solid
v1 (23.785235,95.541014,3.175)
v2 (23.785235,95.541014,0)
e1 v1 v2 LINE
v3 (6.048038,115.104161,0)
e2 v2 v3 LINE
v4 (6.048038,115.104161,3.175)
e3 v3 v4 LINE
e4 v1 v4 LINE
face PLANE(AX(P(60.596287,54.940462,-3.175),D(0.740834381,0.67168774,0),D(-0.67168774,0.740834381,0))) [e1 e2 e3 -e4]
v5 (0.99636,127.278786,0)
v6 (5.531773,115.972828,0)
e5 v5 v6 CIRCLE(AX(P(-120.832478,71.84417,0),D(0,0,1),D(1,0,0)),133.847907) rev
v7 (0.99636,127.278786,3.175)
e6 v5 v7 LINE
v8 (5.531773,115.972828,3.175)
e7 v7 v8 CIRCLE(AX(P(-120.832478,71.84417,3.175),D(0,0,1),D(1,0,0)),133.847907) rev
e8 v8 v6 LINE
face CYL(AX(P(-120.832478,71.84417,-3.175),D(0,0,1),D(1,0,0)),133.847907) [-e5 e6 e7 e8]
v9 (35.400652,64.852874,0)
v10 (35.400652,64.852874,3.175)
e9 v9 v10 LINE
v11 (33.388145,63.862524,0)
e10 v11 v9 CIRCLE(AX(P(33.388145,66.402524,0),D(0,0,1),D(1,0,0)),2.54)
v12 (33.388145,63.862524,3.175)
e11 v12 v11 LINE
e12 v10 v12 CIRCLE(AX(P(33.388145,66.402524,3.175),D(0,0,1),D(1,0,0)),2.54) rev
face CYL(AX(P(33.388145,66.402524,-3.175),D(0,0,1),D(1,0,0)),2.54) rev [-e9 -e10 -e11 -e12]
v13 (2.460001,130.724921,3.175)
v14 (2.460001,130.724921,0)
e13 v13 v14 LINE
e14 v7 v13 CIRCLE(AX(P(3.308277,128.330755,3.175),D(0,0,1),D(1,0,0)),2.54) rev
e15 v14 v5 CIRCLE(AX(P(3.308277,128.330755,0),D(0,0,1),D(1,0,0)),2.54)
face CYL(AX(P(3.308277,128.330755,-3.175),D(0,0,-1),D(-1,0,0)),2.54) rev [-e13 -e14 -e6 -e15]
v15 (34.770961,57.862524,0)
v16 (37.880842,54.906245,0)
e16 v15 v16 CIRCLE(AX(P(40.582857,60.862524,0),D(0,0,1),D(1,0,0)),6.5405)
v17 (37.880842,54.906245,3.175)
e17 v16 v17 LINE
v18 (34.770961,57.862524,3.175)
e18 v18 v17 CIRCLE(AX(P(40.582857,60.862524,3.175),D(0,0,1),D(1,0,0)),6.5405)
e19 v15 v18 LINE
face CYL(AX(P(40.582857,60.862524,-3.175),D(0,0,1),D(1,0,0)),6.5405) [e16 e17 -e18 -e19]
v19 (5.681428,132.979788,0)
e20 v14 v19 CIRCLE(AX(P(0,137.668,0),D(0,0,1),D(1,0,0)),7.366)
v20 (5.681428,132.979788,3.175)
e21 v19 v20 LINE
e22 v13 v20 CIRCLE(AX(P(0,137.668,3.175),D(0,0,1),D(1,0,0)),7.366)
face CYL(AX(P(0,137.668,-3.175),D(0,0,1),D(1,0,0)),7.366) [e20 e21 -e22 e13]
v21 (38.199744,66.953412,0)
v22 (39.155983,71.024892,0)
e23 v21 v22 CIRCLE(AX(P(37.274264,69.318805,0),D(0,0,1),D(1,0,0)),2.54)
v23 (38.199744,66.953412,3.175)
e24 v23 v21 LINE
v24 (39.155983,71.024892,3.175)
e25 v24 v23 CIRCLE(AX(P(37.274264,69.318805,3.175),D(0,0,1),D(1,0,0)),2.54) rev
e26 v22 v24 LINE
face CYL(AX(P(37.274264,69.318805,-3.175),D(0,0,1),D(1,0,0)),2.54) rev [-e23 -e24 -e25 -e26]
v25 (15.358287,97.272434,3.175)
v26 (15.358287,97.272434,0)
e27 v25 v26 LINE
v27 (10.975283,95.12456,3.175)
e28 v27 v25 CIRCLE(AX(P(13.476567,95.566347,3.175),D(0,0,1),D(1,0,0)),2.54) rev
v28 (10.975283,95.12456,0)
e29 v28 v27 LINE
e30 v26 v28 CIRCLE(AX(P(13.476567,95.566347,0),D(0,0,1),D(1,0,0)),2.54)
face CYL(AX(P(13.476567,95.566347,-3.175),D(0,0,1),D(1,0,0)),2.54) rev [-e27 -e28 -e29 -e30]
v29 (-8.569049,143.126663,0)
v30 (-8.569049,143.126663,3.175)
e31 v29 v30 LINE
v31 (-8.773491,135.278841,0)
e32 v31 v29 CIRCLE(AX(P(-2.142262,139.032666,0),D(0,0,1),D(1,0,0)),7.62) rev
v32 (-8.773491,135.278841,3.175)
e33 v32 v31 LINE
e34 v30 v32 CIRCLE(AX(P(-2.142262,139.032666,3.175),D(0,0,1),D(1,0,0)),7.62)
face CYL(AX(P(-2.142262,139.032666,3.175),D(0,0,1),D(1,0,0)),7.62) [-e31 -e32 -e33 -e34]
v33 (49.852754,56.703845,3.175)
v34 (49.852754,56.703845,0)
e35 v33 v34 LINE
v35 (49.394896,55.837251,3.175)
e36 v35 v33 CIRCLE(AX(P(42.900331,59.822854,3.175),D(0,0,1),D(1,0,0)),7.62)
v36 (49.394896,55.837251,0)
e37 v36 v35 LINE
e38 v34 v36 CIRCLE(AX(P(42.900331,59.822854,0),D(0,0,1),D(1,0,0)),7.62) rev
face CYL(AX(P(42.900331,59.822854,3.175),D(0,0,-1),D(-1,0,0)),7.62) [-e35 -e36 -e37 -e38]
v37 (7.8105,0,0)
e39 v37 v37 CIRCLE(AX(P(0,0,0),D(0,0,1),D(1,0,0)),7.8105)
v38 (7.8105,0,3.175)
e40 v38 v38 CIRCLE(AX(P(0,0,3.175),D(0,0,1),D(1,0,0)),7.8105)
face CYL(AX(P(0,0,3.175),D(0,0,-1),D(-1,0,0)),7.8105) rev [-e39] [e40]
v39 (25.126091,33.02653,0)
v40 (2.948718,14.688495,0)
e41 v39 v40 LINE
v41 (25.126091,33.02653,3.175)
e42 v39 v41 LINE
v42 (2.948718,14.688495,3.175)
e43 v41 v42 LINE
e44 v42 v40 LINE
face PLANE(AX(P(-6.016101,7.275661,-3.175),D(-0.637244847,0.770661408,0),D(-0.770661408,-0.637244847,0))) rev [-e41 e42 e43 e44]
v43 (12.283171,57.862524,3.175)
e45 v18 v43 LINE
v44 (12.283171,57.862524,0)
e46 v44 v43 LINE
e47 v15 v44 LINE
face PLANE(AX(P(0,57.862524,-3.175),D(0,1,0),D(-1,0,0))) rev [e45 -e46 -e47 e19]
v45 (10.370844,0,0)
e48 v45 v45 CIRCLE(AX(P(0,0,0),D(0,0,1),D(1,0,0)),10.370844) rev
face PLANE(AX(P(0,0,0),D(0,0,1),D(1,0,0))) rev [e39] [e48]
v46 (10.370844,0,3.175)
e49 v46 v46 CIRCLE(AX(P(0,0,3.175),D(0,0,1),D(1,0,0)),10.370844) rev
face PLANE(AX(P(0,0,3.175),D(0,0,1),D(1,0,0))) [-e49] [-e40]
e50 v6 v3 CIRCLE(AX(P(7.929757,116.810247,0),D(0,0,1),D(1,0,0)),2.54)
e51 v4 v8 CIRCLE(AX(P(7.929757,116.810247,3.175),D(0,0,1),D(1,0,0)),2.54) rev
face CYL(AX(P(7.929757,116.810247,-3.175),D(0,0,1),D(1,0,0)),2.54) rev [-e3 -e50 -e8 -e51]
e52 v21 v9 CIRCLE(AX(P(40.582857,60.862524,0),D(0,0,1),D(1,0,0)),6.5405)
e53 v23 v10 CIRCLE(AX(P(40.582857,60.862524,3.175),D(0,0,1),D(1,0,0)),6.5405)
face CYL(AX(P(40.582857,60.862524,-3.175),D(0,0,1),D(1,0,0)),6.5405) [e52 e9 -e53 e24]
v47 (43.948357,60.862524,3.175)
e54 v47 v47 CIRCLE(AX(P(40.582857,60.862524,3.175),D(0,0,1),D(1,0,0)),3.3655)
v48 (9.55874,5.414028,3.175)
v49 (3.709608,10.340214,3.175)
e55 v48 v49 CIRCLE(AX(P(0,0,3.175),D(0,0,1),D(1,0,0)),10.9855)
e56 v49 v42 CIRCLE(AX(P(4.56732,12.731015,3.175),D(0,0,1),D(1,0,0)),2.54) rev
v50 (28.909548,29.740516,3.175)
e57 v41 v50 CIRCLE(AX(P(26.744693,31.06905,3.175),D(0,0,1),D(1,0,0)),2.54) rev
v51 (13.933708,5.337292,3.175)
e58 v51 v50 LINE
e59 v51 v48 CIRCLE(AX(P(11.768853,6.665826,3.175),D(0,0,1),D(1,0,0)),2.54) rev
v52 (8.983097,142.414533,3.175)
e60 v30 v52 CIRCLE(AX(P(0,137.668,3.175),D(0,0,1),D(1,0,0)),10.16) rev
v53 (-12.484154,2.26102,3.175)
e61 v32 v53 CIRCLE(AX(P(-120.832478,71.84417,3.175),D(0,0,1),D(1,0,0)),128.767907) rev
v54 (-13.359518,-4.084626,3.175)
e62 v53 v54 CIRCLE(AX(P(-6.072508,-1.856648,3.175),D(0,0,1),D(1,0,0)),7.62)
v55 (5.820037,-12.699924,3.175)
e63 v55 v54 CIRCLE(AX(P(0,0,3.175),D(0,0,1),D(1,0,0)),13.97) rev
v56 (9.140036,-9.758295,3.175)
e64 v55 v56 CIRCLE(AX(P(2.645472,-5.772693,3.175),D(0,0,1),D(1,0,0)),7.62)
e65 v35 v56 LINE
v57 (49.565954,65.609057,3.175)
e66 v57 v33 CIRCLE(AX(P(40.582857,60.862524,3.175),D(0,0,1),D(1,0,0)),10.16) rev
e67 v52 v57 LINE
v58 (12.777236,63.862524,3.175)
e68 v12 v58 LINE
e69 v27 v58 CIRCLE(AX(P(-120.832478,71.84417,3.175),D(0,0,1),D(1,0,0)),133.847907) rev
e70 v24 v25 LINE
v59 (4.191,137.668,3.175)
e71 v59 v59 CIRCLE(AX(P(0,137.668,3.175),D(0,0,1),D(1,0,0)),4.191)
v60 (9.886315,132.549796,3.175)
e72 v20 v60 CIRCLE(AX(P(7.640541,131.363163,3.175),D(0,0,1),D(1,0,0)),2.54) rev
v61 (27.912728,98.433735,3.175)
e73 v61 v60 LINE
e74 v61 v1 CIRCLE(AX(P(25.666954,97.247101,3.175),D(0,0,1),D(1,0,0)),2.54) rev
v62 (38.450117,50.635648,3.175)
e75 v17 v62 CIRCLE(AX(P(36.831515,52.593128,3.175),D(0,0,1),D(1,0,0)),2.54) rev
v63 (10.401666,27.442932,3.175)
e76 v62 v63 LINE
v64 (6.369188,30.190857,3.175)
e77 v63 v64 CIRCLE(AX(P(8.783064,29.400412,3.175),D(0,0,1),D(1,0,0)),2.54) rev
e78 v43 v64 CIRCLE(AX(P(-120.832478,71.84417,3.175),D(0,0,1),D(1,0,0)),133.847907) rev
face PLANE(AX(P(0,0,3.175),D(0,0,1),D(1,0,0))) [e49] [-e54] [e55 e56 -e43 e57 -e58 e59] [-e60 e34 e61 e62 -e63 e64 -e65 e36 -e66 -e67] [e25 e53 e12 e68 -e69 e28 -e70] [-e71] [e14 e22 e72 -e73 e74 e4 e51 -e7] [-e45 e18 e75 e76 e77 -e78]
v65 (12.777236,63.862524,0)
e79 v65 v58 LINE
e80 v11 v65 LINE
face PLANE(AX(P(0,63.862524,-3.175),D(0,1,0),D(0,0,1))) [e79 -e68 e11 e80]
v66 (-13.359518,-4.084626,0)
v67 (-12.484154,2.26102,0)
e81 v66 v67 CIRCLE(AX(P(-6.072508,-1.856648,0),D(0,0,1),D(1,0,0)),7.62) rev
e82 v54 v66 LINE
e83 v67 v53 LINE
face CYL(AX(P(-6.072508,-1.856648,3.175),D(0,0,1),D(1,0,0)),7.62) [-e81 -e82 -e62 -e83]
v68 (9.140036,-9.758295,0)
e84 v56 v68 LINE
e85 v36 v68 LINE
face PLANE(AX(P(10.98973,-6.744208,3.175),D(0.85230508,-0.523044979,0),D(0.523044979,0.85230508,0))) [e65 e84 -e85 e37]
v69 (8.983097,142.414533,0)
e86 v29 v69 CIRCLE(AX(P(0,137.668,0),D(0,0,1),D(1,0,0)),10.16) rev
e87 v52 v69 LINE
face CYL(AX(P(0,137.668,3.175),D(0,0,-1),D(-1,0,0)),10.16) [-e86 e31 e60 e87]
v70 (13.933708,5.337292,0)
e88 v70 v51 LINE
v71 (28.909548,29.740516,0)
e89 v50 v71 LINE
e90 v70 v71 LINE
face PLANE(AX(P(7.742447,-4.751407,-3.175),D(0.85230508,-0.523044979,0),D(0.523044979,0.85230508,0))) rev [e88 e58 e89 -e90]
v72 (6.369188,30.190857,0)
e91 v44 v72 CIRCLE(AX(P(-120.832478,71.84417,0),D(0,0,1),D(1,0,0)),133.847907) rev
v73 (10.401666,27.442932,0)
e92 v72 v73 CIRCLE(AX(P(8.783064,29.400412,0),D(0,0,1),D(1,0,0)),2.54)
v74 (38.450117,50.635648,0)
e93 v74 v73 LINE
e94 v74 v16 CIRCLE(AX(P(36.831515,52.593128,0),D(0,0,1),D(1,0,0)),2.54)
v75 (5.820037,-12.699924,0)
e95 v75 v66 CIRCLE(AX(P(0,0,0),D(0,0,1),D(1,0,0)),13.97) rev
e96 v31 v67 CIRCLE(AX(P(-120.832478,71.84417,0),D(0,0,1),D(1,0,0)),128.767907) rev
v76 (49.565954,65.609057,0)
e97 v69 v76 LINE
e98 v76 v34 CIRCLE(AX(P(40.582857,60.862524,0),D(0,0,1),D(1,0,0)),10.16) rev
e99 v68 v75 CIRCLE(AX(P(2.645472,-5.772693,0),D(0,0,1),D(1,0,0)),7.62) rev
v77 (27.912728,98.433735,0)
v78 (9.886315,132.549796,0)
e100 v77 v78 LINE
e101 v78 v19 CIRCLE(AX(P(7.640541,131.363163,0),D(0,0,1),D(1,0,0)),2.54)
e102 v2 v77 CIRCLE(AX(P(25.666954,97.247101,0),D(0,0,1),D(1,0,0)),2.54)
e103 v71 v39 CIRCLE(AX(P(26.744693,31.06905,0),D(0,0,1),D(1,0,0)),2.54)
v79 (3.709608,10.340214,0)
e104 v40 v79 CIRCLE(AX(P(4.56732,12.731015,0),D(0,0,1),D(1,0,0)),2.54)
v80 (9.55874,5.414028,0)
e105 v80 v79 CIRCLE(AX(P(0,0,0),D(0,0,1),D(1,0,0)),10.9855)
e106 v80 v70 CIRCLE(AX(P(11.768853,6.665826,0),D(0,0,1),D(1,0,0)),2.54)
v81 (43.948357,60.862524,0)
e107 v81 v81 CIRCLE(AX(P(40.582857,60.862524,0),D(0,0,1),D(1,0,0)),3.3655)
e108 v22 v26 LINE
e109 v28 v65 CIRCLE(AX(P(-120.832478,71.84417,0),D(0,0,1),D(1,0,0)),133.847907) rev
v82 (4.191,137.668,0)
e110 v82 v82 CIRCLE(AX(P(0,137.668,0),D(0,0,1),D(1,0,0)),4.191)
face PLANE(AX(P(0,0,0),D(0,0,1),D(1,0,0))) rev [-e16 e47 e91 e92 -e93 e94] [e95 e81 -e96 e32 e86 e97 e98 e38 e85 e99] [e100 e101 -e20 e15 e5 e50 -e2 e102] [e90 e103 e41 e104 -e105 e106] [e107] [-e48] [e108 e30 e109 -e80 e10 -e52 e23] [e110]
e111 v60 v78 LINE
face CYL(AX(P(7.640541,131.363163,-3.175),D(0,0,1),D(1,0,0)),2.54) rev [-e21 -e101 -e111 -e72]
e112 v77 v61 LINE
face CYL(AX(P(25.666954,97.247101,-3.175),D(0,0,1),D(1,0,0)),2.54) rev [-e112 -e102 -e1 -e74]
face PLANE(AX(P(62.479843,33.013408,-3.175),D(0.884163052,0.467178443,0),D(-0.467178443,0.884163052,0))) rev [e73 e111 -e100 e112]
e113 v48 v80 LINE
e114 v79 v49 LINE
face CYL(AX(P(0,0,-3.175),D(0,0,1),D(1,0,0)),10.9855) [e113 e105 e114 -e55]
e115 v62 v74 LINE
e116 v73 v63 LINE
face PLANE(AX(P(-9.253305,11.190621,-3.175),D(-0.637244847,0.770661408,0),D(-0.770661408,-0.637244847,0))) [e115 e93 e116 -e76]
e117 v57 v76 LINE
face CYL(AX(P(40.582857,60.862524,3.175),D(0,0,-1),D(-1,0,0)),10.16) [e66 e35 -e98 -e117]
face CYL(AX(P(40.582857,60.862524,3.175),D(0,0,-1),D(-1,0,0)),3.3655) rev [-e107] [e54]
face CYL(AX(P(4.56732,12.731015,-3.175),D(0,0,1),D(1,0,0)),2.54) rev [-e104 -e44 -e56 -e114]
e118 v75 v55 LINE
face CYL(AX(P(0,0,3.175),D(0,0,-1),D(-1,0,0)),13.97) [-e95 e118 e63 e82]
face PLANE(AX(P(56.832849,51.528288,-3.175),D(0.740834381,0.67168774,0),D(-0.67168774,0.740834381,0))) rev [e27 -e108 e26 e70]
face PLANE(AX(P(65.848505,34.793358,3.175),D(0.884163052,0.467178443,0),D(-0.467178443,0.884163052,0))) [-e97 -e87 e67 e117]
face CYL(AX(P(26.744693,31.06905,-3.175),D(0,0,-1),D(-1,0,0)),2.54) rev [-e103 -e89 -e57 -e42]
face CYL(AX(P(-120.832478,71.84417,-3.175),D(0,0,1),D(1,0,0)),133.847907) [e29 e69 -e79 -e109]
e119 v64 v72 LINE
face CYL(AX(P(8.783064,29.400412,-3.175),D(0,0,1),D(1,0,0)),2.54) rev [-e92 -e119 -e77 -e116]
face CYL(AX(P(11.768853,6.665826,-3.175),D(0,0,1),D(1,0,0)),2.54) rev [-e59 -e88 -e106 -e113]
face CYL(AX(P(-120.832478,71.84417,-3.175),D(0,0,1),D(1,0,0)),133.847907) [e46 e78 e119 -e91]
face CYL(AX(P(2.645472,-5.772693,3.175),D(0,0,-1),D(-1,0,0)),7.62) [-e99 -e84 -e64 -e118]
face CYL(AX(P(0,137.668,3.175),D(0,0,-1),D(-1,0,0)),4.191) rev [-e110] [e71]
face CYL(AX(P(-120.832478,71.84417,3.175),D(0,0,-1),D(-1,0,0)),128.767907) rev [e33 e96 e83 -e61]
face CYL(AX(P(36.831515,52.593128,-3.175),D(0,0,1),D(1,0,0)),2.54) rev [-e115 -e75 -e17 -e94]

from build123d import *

# Parameters (mm, degrees)
SKETCH1_R           = 7.8105
SKETCH1_R_2         = 3.3655
SKETCH1_R_3         = 4.191
BOSS_EXTRUDE1_DEPTH = 3.175
CUT_EXTRUDE1_DEPTH  = 6.35
FILLET1_R           = 2.54
FILLET5_R           = 7.62


with BuildPart() as part:
    # Sketch1 → Boss-Extrude1 (new body)
    with BuildSketch(Plane.XY):
        with BuildLine():
            Line((8.98309661, 142.414532976), (49.565953559, 65.609056962))
            ThreePointArc((49.565953559, 65.609056962), (50.742856949, 60.862523985), (49.565953559, 56.115991009))
            Line((49.565953559, 56.115991009), (8.177790267, -11.326281223))
            ThreePointArc((8.177790267, -11.326281223), (-6.360706327, -12.437938536), (-13.97, 0))
            ThreePointArc((-13.97, 0), (7.886144716, 68.281846548), (-10.16, 137.668))
            ThreePointArc((-10.16, 137.668), (-2.445131739, 147.529385845), (8.98309661, 142.414532976))
        make_face()
        Circle(SKETCH1_R, mode=Mode.SUBTRACT)
        with Locations((40.582856949, 60.862523985)):
            Circle(SKETCH1_R_2, mode=Mode.SUBTRACT)
        with Locations((0, 137.668)):
            Circle(SKETCH1_R_3, mode=Mode.SUBTRACT)
    extrude(amount=BOSS_EXTRUDE1_DEPTH)

    # Sketch2 → Cut-Extrude1 (cut)
    with BuildSketch(Plane.XY.offset(3.175)):
        with BuildLine():
            ThreePointArc((-1.687172275, 10.855167431), (6.949528794, 8.507952738), (10.973487677, 0.513593659))
            Line((10.973487677, 0.513593659), (36.90141673, 42.763317023))
            Line((36.90141673, 42.763317023), (-1.687172275, 10.855167431))
        make_face()
        with BuildLine():
            ThreePointArc((12.283170574, 57.862523985), (9.009504683, 39.343064628), (3.172468256, 21.465249632))
            Line((3.172468256, 21.465249632), (44.364286203, 55.525958325))
            ThreePointArc((44.364286203, 55.525958325), (39.035089517, 54.507796908), (34.770960507, 57.862523985))
            Line((34.770960507, 57.862523985), (12.283170574, 57.862523985))
        make_face()
        with BuildLine():
            Line((5.700051608, 115.487969959), (37.341521976, 80.589180404))
            Line((37.341521976, 80.589180404), (7.358422957, 137.33398266))
            ThreePointArc((7.358422957, 137.33398266), (4.930965477, 132.195931336), (-0.431201431, 130.314631974))
            ThreePointArc((-0.431201431, 130.314631974), (2.856784408, 122.993252968), (5.700051608, 115.487969959))
        make_face()
        with BuildLine():
            ThreePointArc((34.770960507, 63.862523985), (38.185315424, 66.94774665), (42.786522834, 67.020607852))
            Line((42.786522834, 67.020607852), (9.033823823, 104.247965684))
            ThreePointArc((9.033823823, 104.247965684), (12.444109183, 84.197859008), (12.777235899, 63.862523985))
            Line((12.777235899, 63.862523985), (34.770960507, 63.862523985))
        make_face()
    extrude(amount=-CUT_EXTRUDE1_DEPTH, mode=Mode.SUBTRACT)

    # Fillet1
    fillet1_edges = [part.edges().sort_by_distance(p)[0] for p in [
        (44.364286203, 55.525958325, 1.5875),
        (3.172468256, 21.465249632, 1.5875),
        (42.786522834, 67.020607852, 1.5875),
        (34.770960507, 63.862523985, 1.5875),
        (9.033823823, 104.247965684, 1.5875),
        (-0.431201431, 130.314631974, 1.5875),
        (7.358422957, 137.33398266, 1.5875),
        (37.341521976, 80.589180404, 1.5875),
        (5.700051608, 115.487969959, 1.5875),
        (10.973487677, 0.513593659, 1.5875),
        (-1.687172275, 10.855167431, 1.5875),
        (36.90141673, 42.763317023, 1.5875),
    ]]
    fillet(fillet1_edges, radius=FILLET1_R)

    # Fillet5
    # the kernel refuses this fillet: 7.62 mm, written as the material it takes off along each edge
    with BuildSketch(Plane(origin=(49.565953559, 56.115991009, -1.635210381), x_dir=(0.4384758636480836, 0.8987429649227121, 0), z_dir=(0, 0, 1))) as fillet5_piece_1:
        with BuildLine():
            CenterArc((0.408802595, 7.616051271), FILLET5_R, 264.46995043, 7.374672414)
            Line((-0.325519955, 0.031516322), (0, 0))
            ThreePointArc((0, 0), (0.327042076, -0.005264972), (0.654084152, 0))
        make_face()
    extrude(amount=6.445420761, mode=Mode.SUBTRACT)
    with BuildSketch(Plane(origin=(8.177790267, -11.326281223, -6.821790927), x_dir=(-0.8640520418582298, -0.5034024920087542, 0), z_dir=(0, 0, 1))) as fillet5_piece_2:
        with BuildLine():
            CenterArc((1.984520997, -7.583572591), FILLET5_R, 84.39536353, 33.842547752)
            Line((-1.620758554, -0.870424346), (0, 0))
            ThreePointArc((0, 0), (1.364358185, 0.066783583), (2.728716371, 0))
        make_face()
    extrude(amount=16.818581854, mode=Mode.SUBTRACT)
    with BuildSketch(Plane(origin=(-13.97, 0, -10.324988133), x_dir=(0.5491862360699723, 0.8356999928869789, 0), z_dir=(0, 0, 1))) as fillet5_piece_3:
        with BuildLine():
            CenterArc((2.785592727, -7.619579496), FILLET5_R, 90.601931521, 49.710102388)
            ThreePointArc((-3.078254062, -2.753400211), (-1.641438538, -1.262317601), (0, 0))
            ThreePointArc((0, 0), (1.352770433, -0.007105957), (2.705540865, 0))
        make_face()
    extrude(amount=23.824976265, mode=Mode.SUBTRACT)
    with BuildSketch(Plane(origin=(-10.16, 137.668, -14.214457568), x_dir=(0.2798121568434471, 0.96005476764746, 0), z_dir=(0, 0, 1))) as fillet5_piece_4:
        with BuildLine():
            CenterArc((3.553614392, -7.315617329), FILLET5_R, 73.751006034, 62.011444153)
            ThreePointArc((-1.90576169, -1.999640205), (-0.947518647, -1.004930558), (0, 0))
            ThreePointArc((0, 0), (2.842891514, 0.405843561), (5.685783027, 0))
        make_face()
    extrude(amount=31.603915135, mode=Mode.SUBTRACT)


solid = part.part
